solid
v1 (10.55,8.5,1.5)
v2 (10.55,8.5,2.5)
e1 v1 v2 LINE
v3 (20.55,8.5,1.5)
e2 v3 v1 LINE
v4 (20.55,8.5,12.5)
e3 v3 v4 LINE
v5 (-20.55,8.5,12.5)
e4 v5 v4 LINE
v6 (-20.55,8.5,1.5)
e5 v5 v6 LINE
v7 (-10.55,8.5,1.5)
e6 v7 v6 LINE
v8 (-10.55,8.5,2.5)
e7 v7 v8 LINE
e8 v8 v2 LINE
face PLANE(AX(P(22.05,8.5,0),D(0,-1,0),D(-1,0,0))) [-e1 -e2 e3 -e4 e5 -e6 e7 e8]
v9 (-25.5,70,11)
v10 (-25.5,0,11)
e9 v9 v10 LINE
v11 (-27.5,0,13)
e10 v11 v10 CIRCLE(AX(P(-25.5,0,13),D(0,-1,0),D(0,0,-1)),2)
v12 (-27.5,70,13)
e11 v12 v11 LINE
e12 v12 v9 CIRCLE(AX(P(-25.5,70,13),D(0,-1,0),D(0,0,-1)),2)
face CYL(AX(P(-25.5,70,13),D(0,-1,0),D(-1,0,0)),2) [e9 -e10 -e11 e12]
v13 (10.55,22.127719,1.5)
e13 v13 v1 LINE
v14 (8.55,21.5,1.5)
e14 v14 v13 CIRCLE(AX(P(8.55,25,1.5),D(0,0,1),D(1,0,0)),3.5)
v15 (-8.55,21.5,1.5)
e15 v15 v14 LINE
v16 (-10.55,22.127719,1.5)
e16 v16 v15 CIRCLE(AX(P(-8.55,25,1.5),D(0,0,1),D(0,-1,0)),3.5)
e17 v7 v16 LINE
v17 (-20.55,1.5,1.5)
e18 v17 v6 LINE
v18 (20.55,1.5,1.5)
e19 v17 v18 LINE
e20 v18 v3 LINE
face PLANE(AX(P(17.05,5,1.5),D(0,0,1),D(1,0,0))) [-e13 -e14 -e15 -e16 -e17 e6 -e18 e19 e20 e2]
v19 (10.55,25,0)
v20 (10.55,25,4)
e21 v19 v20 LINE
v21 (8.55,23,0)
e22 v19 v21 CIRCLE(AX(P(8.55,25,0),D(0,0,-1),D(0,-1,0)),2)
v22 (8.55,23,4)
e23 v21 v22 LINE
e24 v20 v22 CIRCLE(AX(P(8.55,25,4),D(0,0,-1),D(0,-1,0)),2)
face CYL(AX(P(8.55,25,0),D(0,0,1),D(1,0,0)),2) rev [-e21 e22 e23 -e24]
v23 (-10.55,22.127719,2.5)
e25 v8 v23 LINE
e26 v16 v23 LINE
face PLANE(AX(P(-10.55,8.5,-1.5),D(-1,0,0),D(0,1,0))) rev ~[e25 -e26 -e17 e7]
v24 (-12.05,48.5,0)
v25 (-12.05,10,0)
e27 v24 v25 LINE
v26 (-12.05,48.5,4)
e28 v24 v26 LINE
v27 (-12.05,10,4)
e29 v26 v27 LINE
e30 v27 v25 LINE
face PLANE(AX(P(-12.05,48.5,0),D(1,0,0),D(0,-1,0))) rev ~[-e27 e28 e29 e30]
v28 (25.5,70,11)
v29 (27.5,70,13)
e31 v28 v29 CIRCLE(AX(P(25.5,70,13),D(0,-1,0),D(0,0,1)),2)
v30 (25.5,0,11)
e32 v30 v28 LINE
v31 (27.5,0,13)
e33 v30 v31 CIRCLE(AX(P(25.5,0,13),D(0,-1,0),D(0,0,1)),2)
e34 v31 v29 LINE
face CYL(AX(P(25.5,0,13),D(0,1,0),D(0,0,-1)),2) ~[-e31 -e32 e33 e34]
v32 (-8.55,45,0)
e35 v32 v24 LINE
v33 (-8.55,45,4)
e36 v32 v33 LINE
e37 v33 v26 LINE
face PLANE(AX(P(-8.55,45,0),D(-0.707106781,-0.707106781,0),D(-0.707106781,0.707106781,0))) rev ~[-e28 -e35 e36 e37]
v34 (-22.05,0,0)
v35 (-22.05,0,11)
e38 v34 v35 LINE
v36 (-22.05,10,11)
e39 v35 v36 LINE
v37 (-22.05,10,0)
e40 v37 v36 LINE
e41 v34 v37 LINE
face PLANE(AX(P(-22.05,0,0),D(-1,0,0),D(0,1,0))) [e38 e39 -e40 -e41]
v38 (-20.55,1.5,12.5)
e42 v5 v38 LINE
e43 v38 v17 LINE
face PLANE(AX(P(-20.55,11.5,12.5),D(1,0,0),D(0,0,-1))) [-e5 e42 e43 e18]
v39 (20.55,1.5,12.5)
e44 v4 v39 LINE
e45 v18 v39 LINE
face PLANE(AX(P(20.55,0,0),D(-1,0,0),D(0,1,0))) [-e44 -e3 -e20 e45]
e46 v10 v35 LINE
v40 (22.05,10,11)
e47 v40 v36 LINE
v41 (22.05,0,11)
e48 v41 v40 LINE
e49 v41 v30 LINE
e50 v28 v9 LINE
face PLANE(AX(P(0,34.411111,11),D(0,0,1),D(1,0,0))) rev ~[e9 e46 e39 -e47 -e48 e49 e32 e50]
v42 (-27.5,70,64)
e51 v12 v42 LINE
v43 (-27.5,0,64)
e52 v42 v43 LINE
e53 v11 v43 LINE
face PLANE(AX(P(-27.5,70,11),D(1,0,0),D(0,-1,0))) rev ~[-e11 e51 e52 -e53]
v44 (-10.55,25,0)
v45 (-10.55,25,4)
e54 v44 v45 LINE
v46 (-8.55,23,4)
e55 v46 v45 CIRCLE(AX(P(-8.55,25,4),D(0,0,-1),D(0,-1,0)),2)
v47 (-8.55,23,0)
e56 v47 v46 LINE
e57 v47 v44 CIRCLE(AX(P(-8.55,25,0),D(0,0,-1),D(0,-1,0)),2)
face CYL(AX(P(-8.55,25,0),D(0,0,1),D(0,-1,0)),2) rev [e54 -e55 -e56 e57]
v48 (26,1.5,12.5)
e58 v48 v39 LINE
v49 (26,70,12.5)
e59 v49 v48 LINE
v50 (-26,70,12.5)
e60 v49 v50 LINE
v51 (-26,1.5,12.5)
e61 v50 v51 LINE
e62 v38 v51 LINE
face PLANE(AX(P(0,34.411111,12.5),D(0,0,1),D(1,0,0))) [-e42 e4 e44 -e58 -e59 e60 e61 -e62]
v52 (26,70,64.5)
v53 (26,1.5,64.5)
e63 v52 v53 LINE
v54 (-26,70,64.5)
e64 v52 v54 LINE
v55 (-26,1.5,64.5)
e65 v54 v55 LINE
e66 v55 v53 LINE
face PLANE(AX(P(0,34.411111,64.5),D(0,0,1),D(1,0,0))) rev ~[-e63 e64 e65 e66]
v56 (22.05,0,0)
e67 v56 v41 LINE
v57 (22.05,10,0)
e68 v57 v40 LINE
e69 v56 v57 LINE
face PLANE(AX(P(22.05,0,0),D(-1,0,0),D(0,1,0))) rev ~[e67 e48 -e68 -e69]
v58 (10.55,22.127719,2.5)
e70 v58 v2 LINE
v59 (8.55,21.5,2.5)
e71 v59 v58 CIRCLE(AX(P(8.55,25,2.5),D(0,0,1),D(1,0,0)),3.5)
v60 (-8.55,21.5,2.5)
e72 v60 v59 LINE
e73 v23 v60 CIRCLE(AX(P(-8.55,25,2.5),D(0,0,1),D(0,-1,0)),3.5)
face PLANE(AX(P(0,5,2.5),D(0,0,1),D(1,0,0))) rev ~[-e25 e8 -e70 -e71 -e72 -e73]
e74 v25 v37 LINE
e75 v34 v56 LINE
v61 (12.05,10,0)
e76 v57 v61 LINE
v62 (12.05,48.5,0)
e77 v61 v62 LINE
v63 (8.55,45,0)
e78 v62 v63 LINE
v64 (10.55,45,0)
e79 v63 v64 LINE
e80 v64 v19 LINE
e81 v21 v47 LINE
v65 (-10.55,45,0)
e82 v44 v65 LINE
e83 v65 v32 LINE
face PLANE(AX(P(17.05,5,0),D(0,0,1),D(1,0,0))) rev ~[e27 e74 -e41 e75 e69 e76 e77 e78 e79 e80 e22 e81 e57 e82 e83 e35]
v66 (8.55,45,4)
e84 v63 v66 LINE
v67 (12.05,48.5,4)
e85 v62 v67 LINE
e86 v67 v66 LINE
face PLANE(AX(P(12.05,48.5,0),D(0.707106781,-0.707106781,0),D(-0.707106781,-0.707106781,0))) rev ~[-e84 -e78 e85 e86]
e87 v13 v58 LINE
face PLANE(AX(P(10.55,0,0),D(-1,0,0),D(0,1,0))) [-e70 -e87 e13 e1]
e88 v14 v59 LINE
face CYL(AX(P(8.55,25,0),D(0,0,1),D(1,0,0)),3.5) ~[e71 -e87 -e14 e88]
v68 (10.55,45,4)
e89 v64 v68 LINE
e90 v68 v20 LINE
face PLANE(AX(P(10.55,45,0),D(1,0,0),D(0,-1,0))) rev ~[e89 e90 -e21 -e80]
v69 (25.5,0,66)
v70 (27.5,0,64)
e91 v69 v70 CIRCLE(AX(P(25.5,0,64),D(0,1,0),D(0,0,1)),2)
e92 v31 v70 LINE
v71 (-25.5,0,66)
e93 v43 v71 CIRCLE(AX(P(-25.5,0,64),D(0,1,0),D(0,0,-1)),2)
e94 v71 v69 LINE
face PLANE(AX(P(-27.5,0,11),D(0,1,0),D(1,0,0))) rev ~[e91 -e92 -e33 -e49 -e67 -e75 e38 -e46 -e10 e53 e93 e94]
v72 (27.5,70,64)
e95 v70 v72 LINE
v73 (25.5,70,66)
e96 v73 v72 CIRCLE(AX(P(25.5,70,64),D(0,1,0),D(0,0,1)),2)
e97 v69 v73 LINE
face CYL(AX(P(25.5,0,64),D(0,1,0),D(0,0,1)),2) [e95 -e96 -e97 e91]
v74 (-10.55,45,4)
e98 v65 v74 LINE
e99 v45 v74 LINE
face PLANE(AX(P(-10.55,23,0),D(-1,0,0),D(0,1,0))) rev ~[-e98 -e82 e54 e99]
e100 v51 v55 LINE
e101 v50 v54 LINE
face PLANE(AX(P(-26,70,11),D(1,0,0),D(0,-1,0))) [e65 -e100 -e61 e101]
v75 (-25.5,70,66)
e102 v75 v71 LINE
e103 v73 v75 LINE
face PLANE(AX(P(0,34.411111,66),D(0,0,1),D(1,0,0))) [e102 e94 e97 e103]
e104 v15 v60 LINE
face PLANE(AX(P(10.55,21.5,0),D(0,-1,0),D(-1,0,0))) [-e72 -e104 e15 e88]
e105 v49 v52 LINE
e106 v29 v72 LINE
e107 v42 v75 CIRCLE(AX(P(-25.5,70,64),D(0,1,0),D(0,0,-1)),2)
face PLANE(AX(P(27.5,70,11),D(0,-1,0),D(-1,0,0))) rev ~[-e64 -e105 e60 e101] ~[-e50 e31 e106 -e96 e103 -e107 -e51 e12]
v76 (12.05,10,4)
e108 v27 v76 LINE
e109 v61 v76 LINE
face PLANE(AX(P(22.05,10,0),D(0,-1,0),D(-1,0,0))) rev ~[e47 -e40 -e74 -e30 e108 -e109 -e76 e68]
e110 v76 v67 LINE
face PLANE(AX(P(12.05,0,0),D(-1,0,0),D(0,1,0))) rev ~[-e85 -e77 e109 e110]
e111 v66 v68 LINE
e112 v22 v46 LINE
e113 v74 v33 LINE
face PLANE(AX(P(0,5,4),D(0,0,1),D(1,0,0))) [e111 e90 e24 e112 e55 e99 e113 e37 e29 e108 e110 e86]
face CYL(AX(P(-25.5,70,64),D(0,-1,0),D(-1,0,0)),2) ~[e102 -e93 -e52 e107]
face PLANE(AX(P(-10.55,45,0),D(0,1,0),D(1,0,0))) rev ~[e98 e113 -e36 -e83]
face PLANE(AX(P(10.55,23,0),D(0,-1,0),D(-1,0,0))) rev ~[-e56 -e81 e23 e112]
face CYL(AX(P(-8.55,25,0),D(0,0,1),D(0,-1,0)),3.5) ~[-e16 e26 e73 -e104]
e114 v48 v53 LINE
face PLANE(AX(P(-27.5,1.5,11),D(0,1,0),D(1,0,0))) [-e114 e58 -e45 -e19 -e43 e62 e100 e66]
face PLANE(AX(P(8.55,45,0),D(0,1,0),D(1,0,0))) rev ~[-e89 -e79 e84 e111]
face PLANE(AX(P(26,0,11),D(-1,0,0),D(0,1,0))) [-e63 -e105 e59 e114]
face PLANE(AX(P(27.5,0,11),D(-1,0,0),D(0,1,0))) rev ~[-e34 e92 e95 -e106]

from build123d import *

# Parameters (mm, degrees)
F1_DEPTH    = 4
F2_R        = 2
F0_W        = 10
F0_H        = 10
F3_DEPTH    = 11
F4_W        = 44.1
F4_H        = 10
F5_DEPTH    = 55
F6_T        = 1.5
F6_T3_DEPTH = 13
F6_T5_DEPTH = 47.1
F6_T7_DEPTH = 7
F6_T9_DEPTH = 27.1
F7_R        = 2


# Not quite as in the source:
# - a shell that OpenCascade refuses in one call is made with other operations: the cavity is built on its own and cut out


with BuildPart() as f1:
    # F0 (on Top) → F1 (new body)
    with BuildSketch(Plane.XY):
        Polygon((-12.05, 0), (0, 0), (12.05, 0), (12.05, 10), (-12.05, 10), align=None)
        Polygon((-12.05, 48.5), (-12.05, 10), (12.05, 10), (12.05, 48.5), (8.55, 45), (10.55, 45), (10.55, 23), (0, 23), (-10.55, 23), (-10.55, 45), (-8.55, 45), align=None)
    extrude(amount=F1_DEPTH)

    # F2
    f2_edges = [f1.edges().sort_by_distance(p)[0] for p in [
        (-10.55, 23, 2),
        (10.55, 23, 2),
    ]]
    fillet(f2_edges, radius=F2_R)

    # F0 (on Top) → F3 (join)
    with BuildSketch(Plane.XY):
        with Locations((17.05, 5)):
            Rectangle(F0_W, F0_H)
        Polygon((-12.05, 0), (0, 0), (12.05, 0), (12.05, 10), (-12.05, 10), align=None)
        with Locations((-17.05, 5)):
            Rectangle(F0_W, F0_H)
    extrude(amount=F3_DEPTH)

    # F4 (on face) → F5 (join)
    with BuildSketch(Plane.XY.offset(11)):
        Polygon((-27.5, 70), (-27.5, 0), (-22.05, 0), (-22.05, 10), (22.05, 10), (22.05, 0), (27.5, 0), (27.5, 70), align=None)
        with Locations((0, 5)):
            Rectangle(F4_W, F4_H)
    extrude(amount=F5_DEPTH)

    # F6: shell of thickness 1.5, made by hand


with BuildPart() as f6_core1:
    # F6_t2: copy of F1
    add(f1.part)

    # the walls: a layer under each face that stays
    f6_faces = [f6_core1.faces().sort_by_distance(p)[0] for p in [
        (-27.5, 35, 38.5),
        (0, 0, 33),
        (0, 35, 11),
        (0, 35, 66),
        (27.5, 35, 38.5),
        (22.05, 5, 5.5),
        (0, 10, 5.5),
        (-22.05, 5, 5.5),
        (-14.7, 8.0833333333, 0),
        (12.05, 29.25, 2),
        (-8.0333333333, 16.4166666667, 4),
        (-12.05, 29.25, 2),
        (10.55, 35, 2),
        (9.9642135624, 23.5857864376, 2),
        (0, 23, 2),
        (-9.9642135624, 23.5857864376, 2),
        (-10.55, 35, 2),
        (-9.55, 45, 2),
        (-10.3, 46.75, 2),
        (10.3, 46.75, 2),
        (9.55, 45, 2),
    ]]
    thicken(f6_faces, amount=-F6_T, mode=Mode.SUBTRACT)

    # F6_s4 → F6_t3 (cut)
    with BuildSketch(Plane.XZ.offset(-11.5)):
        Polygon((22.065, 10.985), (22.05, 12.5), (20.55, 12.5), (20.55, 11), align=None)
        Polygon((-22.065, 10.985), (-22.05, 12.5), (-20.55, 12.5), (-20.55, 11), align=None)
    extrude(amount=F6_T3_DEPTH, mode=Mode.SUBTRACT)

    # F6_s6 → F6_t5 (cut)
    with BuildSketch(Plane.YZ.offset(-23.55)):
        Polygon((10.015, 10.985), (10, 12.5), (8.5, 12.5), (8.5, 11), align=None)
    extrude(amount=F6_T5_DEPTH, mode=Mode.SUBTRACT)

    # F6_s8 → F6_t7 (cut)
    with BuildSketch(Plane.XY.offset(-1.5)):
        Polygon((12.065, 10.015), (12.05, 8.5), (10.55, 8.5), (10.55, 10), align=None)
        Polygon((-12.065, 10.015), (-12.05, 8.5), (-10.55, 8.5), (-10.55, 10), align=None)
        Polygon((10.535, 44.985), (12.05, 45), (12.05, 46.5), (10.55, 46.5), align=None)
        Polygon((-10.535, 44.985), (-12.05, 45), (-12.05, 46.5), (-10.55, 46.5), align=None)
    extrude(amount=F6_T7_DEPTH, mode=Mode.SUBTRACT)

    # F6_s10 → F6_t9 (cut)
    with BuildSketch(Plane.YZ.offset(-13.55)):
        Polygon((10.015, 4.015), (8.5, 4), (8.5, 2.5), (10, 2.5), align=None)
    extrude(amount=F6_T9_DEPTH, mode=Mode.SUBTRACT)


with BuildPart() as f1_1:
    add(f1.part)

    # what is left inside the walls is the cavity
    f6_cavity = [f6_core1.part.solids().sort_by_distance(p)[0] for p in [
        (-25.985, 35.75, 47.166667),
    ]]
    add(f6_cavity, mode=Mode.SUBTRACT)

    # F7
    f7_edges = [f1_1.edges().sort_by_distance(p)[0] for p in [
        (-27.5, 35, 66),
        (-27.5, 35, 11),
        (27.5, 35, 11),
        (27.5, 35, 66),
    ]]
    fillet(f7_edges, radius=F7_R)


solid = f1_1.part
